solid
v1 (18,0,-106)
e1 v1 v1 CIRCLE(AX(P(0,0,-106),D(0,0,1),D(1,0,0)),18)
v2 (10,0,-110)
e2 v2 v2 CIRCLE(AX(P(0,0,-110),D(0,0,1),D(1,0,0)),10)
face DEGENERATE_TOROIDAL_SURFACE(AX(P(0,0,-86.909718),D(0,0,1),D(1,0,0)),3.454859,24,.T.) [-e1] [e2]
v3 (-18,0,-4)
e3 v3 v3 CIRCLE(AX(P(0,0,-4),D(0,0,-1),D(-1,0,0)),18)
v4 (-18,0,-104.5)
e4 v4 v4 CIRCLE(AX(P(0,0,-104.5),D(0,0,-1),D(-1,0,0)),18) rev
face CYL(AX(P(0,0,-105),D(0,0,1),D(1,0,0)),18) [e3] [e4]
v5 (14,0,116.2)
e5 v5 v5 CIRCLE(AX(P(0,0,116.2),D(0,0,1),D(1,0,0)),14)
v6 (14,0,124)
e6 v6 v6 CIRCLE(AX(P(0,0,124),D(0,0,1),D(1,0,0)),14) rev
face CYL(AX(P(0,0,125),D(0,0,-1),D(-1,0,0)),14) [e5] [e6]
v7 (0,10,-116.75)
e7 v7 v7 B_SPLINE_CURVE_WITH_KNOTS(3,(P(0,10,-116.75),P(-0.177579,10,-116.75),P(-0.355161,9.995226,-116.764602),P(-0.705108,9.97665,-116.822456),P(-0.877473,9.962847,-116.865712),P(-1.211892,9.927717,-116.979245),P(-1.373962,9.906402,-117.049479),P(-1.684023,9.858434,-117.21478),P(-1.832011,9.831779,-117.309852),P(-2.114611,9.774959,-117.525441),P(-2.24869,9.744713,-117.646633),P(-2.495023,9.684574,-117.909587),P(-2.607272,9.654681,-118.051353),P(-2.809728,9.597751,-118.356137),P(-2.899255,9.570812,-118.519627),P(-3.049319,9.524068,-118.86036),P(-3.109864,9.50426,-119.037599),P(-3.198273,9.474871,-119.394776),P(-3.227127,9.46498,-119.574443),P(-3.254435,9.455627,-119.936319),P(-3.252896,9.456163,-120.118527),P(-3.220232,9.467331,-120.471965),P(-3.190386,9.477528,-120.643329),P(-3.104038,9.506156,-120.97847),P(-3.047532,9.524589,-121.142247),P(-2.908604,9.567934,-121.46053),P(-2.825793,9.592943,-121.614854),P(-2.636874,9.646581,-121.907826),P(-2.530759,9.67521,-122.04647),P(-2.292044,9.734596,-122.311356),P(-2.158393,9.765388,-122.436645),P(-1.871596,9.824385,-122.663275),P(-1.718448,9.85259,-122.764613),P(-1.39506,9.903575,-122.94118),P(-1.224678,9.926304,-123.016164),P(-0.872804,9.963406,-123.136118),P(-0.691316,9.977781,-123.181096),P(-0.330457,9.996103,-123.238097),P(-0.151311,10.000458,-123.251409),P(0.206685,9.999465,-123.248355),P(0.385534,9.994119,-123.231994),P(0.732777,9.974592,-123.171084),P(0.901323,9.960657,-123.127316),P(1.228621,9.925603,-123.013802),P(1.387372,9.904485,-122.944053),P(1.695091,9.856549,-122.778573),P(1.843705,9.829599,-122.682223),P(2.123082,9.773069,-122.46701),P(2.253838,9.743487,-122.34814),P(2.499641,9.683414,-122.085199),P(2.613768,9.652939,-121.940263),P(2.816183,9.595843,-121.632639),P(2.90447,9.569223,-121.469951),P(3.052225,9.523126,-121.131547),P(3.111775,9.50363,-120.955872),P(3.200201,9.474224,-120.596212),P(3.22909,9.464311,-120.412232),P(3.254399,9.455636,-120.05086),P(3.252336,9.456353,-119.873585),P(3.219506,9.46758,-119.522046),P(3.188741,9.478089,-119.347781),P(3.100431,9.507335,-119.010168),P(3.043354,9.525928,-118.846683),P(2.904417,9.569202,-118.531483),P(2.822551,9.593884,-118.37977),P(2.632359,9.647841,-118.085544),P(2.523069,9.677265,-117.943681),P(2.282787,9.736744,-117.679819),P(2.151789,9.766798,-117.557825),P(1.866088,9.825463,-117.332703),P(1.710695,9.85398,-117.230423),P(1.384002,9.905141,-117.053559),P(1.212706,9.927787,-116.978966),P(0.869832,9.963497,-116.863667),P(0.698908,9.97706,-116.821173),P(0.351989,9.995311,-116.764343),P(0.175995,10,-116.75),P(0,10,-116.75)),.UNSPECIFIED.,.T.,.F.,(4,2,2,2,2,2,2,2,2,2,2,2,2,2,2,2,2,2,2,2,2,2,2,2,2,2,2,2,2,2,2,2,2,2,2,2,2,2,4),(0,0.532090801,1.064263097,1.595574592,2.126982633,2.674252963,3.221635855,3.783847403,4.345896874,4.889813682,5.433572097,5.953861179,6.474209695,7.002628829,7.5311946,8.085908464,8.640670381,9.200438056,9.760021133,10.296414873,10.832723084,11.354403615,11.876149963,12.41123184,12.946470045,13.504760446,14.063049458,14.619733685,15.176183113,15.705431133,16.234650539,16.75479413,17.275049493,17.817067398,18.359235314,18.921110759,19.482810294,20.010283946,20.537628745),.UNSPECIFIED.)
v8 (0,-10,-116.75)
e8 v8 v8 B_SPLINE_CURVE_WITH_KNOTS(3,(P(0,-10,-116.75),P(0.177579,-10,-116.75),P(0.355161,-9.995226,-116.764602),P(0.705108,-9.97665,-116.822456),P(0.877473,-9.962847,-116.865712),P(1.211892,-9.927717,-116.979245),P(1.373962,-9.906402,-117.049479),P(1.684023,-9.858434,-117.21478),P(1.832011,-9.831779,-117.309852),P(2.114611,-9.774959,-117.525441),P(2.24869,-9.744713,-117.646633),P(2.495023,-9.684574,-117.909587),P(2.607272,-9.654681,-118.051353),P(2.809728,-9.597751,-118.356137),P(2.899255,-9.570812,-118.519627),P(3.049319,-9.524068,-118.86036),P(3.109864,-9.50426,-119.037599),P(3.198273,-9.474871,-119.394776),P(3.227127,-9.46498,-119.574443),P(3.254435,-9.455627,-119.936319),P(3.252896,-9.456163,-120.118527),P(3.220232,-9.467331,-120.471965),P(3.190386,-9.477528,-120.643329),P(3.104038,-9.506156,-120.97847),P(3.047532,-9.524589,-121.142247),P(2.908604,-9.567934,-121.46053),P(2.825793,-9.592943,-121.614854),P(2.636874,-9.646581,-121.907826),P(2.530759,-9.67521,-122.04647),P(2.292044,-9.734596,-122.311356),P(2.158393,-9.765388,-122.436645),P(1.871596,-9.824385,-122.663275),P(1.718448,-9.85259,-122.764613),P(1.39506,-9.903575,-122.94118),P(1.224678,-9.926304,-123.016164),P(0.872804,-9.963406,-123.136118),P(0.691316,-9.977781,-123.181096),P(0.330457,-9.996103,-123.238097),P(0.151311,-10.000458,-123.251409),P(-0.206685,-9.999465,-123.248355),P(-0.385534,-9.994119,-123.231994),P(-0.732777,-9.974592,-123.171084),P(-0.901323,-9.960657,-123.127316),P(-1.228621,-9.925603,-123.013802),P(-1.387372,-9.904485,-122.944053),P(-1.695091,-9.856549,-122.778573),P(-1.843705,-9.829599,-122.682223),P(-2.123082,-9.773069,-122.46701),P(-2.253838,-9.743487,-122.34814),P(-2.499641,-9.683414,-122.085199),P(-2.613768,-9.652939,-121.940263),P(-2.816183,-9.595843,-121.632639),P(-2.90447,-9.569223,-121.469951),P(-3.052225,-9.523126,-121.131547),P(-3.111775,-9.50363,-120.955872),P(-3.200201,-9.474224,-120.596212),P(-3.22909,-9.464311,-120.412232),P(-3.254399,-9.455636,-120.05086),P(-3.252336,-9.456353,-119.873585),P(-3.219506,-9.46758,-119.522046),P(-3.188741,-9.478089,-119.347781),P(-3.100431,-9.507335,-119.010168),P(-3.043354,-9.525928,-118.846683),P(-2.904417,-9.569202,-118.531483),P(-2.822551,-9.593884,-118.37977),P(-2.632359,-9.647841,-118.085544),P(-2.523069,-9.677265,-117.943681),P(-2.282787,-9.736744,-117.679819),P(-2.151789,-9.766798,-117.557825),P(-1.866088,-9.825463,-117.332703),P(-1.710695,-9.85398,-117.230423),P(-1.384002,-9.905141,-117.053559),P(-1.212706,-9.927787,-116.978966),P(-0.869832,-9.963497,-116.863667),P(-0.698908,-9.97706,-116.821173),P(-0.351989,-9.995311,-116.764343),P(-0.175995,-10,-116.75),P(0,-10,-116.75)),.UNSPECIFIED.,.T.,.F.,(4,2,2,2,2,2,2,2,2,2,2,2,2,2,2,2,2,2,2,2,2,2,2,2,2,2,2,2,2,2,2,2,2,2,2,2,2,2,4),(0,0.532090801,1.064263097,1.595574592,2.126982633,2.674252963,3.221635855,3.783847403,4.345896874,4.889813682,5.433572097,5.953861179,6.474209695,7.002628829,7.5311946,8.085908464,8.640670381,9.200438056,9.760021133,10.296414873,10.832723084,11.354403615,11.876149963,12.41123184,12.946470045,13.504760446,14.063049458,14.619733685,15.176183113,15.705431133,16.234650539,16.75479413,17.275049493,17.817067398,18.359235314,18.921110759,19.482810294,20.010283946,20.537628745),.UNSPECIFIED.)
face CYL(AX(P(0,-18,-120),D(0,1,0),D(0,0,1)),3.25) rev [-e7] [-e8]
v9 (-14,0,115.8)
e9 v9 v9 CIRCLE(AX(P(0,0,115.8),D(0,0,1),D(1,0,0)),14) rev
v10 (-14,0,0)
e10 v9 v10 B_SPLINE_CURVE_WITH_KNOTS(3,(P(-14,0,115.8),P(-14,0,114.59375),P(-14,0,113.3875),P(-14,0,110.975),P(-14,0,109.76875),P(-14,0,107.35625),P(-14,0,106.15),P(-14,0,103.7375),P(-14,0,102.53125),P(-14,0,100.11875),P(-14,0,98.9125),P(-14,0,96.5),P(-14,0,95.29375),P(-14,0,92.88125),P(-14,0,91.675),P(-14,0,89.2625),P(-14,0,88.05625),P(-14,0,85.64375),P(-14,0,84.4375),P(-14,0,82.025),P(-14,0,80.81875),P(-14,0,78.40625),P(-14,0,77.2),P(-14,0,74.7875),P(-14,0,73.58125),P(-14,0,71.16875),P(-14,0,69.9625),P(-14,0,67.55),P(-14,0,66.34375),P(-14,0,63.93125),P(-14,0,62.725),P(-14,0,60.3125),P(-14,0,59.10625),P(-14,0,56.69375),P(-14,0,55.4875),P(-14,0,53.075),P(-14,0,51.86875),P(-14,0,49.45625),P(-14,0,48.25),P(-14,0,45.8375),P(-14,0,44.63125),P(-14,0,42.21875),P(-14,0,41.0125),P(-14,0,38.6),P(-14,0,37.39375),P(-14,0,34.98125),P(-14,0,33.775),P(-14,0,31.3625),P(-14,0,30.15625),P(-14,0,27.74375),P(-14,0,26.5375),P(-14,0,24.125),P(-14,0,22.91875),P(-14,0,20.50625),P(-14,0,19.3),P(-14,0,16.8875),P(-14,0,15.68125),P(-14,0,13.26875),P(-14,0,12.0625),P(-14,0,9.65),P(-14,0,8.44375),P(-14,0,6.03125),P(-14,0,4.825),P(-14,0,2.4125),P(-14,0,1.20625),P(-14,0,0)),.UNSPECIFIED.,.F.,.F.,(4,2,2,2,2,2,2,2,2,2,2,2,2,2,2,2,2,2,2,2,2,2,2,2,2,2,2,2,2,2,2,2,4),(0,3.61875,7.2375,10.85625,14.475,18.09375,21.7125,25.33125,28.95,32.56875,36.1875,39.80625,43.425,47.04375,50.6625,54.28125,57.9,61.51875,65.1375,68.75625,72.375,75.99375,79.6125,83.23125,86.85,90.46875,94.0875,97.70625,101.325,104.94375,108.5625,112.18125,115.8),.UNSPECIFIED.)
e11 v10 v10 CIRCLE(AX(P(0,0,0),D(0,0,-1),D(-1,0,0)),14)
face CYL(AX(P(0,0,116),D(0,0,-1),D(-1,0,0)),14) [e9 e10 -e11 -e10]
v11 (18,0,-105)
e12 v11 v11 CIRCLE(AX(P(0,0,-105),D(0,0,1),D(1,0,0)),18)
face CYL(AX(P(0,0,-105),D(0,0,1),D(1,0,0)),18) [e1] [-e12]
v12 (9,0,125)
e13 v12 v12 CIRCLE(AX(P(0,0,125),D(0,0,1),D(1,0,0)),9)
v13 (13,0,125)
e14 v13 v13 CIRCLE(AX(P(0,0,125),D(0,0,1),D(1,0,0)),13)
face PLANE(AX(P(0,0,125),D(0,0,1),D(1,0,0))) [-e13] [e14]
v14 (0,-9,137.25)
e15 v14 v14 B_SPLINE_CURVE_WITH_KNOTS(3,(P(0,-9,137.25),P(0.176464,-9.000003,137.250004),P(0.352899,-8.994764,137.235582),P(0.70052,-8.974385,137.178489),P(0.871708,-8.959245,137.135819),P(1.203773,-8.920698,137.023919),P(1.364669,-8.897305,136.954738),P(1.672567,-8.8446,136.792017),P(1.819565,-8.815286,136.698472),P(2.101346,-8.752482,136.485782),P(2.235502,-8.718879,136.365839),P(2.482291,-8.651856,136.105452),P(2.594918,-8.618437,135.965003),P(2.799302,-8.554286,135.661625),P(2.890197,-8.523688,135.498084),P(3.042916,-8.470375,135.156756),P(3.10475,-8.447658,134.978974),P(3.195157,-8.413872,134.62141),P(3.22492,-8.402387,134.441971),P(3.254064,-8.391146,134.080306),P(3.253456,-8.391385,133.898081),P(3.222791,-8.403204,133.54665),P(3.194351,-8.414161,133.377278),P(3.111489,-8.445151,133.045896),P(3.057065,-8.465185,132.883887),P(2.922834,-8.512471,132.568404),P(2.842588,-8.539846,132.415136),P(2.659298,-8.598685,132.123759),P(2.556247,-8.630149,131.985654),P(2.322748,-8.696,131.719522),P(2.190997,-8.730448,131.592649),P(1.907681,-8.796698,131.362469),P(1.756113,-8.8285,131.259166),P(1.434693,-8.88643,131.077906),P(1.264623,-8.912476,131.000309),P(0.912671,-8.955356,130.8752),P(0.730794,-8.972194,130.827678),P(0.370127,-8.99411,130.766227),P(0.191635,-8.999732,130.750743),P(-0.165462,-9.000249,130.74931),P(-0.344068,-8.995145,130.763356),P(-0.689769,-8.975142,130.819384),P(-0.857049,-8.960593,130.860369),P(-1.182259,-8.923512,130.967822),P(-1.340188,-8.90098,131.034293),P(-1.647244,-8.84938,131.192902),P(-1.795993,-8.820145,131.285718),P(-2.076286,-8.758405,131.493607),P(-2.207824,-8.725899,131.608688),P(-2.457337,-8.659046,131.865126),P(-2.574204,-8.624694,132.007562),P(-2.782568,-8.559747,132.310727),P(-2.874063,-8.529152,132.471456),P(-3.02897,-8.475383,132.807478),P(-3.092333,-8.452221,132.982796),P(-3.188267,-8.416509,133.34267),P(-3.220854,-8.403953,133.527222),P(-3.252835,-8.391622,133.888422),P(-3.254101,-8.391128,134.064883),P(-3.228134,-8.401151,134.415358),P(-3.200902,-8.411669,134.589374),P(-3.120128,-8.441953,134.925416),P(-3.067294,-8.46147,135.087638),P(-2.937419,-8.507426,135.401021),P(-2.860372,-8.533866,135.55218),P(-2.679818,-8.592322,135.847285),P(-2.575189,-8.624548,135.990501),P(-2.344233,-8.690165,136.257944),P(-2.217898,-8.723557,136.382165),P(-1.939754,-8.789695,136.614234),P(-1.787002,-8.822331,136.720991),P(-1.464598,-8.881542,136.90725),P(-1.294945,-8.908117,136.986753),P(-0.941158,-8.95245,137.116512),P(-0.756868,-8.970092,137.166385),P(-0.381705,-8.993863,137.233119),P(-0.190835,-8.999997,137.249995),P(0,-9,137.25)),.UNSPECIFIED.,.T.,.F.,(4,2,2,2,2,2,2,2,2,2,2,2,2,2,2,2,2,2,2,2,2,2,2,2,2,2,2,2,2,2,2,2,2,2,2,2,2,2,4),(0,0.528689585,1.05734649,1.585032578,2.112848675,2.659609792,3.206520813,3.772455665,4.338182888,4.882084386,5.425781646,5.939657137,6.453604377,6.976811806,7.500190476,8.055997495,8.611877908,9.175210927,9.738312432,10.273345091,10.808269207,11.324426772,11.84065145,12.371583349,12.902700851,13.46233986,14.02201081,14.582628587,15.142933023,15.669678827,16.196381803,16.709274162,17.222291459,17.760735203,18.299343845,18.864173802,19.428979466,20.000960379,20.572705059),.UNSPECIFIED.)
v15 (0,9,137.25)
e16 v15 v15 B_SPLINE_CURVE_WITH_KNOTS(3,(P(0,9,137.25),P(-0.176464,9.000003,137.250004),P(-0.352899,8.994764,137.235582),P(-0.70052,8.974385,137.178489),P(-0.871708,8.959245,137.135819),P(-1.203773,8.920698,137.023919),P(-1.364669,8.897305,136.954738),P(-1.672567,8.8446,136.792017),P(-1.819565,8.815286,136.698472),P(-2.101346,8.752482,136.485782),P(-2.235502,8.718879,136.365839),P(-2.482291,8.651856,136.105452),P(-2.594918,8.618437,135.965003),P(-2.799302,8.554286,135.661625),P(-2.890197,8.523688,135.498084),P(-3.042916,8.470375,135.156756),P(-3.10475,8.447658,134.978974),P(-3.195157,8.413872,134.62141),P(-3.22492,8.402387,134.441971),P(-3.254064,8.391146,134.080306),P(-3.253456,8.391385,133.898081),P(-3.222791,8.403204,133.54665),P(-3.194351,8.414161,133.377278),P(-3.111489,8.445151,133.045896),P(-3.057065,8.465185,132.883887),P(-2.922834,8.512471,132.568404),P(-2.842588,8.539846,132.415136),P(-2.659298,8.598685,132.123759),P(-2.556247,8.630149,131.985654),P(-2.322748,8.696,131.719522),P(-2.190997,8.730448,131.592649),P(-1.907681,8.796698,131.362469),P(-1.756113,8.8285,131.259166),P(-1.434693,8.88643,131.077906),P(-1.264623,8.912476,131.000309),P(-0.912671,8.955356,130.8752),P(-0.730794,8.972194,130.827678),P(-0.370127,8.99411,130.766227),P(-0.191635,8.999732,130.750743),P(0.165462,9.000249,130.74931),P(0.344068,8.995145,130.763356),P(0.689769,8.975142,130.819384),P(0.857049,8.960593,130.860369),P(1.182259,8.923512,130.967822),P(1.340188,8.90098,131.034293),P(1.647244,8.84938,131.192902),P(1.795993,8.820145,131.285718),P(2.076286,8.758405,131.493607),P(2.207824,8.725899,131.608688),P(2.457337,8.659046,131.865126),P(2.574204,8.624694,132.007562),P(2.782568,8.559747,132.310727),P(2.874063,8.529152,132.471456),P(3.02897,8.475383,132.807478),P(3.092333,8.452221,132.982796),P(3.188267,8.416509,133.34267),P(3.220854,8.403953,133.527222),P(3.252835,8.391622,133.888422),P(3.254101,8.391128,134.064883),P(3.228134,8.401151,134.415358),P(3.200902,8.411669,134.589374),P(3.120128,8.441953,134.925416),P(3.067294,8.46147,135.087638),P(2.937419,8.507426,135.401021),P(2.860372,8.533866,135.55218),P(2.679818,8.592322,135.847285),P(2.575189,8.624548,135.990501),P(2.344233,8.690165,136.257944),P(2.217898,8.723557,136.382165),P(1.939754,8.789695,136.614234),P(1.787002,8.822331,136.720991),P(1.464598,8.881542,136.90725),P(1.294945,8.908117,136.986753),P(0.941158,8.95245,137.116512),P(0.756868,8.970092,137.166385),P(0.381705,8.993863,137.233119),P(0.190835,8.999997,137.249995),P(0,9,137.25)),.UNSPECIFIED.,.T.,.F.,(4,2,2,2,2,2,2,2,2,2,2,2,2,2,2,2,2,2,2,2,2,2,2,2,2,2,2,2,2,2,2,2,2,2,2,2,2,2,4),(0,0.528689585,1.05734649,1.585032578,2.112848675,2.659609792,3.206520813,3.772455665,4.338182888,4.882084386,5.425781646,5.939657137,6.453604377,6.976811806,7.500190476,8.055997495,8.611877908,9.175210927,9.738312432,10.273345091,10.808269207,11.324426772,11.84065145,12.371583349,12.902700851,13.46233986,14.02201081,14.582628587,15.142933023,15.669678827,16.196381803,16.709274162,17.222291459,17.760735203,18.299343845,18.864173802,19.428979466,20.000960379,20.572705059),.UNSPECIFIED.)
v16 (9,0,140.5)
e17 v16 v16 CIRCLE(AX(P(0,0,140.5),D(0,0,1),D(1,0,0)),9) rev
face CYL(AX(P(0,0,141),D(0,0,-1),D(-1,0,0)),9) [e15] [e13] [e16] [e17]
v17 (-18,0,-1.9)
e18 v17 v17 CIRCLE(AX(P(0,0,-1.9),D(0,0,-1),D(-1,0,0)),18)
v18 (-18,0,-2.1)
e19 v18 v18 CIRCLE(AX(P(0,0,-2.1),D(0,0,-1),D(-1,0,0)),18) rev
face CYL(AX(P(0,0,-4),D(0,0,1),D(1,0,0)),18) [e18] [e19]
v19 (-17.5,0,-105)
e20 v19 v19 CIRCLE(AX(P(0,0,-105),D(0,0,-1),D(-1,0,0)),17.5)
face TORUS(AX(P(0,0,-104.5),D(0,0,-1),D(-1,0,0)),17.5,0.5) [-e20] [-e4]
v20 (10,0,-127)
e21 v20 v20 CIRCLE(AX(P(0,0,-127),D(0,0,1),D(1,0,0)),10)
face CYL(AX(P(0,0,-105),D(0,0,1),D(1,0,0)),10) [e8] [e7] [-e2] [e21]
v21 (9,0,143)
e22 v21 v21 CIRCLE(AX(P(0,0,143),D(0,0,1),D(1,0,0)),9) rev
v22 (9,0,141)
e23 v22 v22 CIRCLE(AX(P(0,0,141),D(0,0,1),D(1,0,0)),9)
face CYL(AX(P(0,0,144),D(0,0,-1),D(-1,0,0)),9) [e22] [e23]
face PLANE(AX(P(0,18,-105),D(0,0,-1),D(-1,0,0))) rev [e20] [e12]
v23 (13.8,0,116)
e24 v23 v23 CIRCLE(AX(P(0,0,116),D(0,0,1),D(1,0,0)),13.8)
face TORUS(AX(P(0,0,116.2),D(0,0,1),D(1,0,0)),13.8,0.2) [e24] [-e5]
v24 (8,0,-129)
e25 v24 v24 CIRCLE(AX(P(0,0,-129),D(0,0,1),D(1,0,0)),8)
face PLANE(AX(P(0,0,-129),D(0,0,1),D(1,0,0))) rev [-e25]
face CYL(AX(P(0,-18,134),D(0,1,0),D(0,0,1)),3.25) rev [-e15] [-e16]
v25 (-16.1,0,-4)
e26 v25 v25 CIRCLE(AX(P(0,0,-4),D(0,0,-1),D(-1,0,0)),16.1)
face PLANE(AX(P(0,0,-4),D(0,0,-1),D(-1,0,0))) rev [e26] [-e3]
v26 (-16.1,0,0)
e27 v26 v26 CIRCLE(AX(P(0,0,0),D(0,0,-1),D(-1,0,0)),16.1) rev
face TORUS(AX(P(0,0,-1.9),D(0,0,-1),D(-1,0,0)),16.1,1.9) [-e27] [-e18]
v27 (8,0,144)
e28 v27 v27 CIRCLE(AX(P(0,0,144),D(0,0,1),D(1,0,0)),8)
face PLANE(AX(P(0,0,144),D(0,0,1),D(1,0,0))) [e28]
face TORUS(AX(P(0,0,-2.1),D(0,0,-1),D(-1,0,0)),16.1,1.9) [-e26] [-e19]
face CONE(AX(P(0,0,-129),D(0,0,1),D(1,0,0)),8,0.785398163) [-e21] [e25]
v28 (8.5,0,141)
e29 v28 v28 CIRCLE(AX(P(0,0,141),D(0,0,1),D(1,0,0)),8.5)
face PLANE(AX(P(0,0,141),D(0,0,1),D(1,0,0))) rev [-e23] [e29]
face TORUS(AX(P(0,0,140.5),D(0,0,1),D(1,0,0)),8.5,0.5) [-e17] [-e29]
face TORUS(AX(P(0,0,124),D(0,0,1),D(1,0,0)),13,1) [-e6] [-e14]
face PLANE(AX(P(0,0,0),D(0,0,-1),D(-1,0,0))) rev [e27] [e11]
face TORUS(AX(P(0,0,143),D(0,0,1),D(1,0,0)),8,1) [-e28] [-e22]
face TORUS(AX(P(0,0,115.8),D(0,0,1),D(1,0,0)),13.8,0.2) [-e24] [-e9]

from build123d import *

# Parameters (mm, degrees)
SKETCH_1_R               = 14
EXTRUDE_1_DEPTH          = 116
SKETCH_2_R               = 18
EXTRUDE_2_DEPTH          = 4
FILLET_1_R               = 1.9
FILLET_2_R               = 0.2
SKETCH_3_R               = 14
EXTRUDE_3_DEPTH          = 9
FILLET_4_R               = 0.2
FILLET_5_R               = 1
SKETCH_4_R               = 18
EXTRUDE_4_DEPTH          = 101
FILLET_6_R               = 0.5
SKETCH_6_R               = 9
EXTRUDE_5_DEPTH          = 16
FILLET_7_R               = 0.5
SKETCH_7_R               = 9
EXTRUDE_6_DEPTH          = 3
FILLET_8_R               = 1
CUT_EXTRUDE_1_DEPTH      = 147.232691308
CUT_EXTRUDE_1_DEPTH_BACK = 147.232691308
SKETCH_8_R               = 3.25


with BuildPart() as part:
    # Эскиз1 → Бобышка-Вытянуть1 (new body)
    with BuildSketch(Plane.XY):
        with Locations(Location((0, 0, 0), (0, 0, 180))):
            Circle(SKETCH_1_R)
    extrude(amount=EXTRUDE_1_DEPTH)

    # Эскиз2 → Бобышка-Вытянуть2 (add)
    with BuildSketch(Plane(origin=(0, 0, 0), x_dir=(-1, 0, 0), z_dir=(0, 0, -1))):
        Circle(SKETCH_2_R)
    extrude(amount=EXTRUDE_2_DEPTH)

    # Скругление1
    fillet_1_edges = [part.edges().sort_by_distance(p)[0] for p in [
        (18, 0, 0),
        (18, 0, -4),
    ]]
    fillet(fillet_1_edges, radius=FILLET_1_R)

    # Скругление2
    fillet_2_edges = [part.edges().sort_by_distance(p)[0] for p in [
        (14, 0, 116),
    ]]
    fillet(fillet_2_edges, radius=FILLET_2_R)

    # Эскиз3 → Бобышка-Вытянуть3 (add)
    with BuildSketch(Plane.XY.offset(116)):
        with Locations(Location((0, 0, 0), (0, 0, 180))):
            Circle(SKETCH_3_R)
    extrude(amount=EXTRUDE_3_DEPTH)

    # Скругление4
    fillet_4_edges = [part.edges().sort_by_distance(p)[0] for p in [
        (14, 0, 116),
    ]]
    fillet(fillet_4_edges, radius=FILLET_4_R - 0.0001)  # a hair under: the kernel refuses the full size

    # Скругление5
    fillet_5_edges = [part.edges().sort_by_distance(p)[0] for p in [
        (14, 0, 125),
    ]]
    fillet(fillet_5_edges, radius=FILLET_5_R)

    # Эскиз4 → Бобышка-Вытянуть4 (add)
    with BuildSketch(Plane(origin=(0, 0, -4), x_dir=(-1, 0, 0), z_dir=(0, 0, -1))):
        Circle(SKETCH_4_R)
    extrude(amount=EXTRUDE_4_DEPTH)

    # Скругление6
    fillet_6_edges = [part.edges().sort_by_distance(p)[0] for p in [
        (18, 0, -105),
    ]]
    fillet(fillet_6_edges, radius=FILLET_6_R)

    # Эскиз5 → Повернуть1 (revolve)
    with BuildSketch(Plane(origin=(0, 0, 0), x_dir=(0, 0, -1), z_dir=(1, 0, 0)), mode=Mode.PRIVATE) as revolve_1_sk:
        with BuildLine():
            Line((105, 0), (129, 0))
            Line((129, 0), (129, 8))
            Line((129, 8), (127, 10))
            Line((127, 10), (110, 10))
            ThreePointArc((110, 10), (108.375970462, 14.187985231), (106, 18))
            Line((106, 18), (105, 18))
            Line((105, 18), (105, 0))
        make_face()
    revolve(revolve_1_sk.sketch.rotate(Axis((0, 0, -105), (0, 0, -1)), 90), axis=Axis((0, 0, -105), (0, 0, -1)))

    # Эскиз6 → Бобышка-Вытянуть5 (add)
    with BuildSketch(Plane.XY.offset(125)):
        Circle(SKETCH_6_R)
    extrude(amount=EXTRUDE_5_DEPTH)

    # Скругление7
    fillet_7_edges = [part.edges().sort_by_distance(p)[0] for p in [
        (-9, 0, 141),
    ]]
    fillet(fillet_7_edges, radius=FILLET_7_R)

    # Эскиз7 → Бобышка-Вытянуть6 (add)
    with BuildSketch(Plane.XY.offset(141)):
        Circle(SKETCH_7_R)
    extrude(amount=EXTRUDE_6_DEPTH)

    # Скругление8
    fillet_8_edges = [part.edges().sort_by_distance(p)[0] for p in [
        (-9, 0, 144),
    ]]
    fillet(fillet_8_edges, radius=FILLET_8_R)

    # Эскиз8 → Вырез-Вытянуть1 (cut, two sides: drawn at the far end of the back side and taken through both)
    with BuildSketch(Plane(origin=(0, 0, 0), x_dir=(1, 0, 0), z_dir=(0, 1, 0)).offset(-CUT_EXTRUDE_1_DEPTH_BACK)):
        with Locations(Location((0, -134, 0), (0, 0, 270))):
            Circle(SKETCH_8_R)
        with Locations(Location((0, 120, 0), (0, 0, 270))):
            Circle(SKETCH_8_R)
    extrude(amount=CUT_EXTRUDE_1_DEPTH + CUT_EXTRUDE_1_DEPTH_BACK, mode=Mode.SUBTRACT)


solid = part.part
